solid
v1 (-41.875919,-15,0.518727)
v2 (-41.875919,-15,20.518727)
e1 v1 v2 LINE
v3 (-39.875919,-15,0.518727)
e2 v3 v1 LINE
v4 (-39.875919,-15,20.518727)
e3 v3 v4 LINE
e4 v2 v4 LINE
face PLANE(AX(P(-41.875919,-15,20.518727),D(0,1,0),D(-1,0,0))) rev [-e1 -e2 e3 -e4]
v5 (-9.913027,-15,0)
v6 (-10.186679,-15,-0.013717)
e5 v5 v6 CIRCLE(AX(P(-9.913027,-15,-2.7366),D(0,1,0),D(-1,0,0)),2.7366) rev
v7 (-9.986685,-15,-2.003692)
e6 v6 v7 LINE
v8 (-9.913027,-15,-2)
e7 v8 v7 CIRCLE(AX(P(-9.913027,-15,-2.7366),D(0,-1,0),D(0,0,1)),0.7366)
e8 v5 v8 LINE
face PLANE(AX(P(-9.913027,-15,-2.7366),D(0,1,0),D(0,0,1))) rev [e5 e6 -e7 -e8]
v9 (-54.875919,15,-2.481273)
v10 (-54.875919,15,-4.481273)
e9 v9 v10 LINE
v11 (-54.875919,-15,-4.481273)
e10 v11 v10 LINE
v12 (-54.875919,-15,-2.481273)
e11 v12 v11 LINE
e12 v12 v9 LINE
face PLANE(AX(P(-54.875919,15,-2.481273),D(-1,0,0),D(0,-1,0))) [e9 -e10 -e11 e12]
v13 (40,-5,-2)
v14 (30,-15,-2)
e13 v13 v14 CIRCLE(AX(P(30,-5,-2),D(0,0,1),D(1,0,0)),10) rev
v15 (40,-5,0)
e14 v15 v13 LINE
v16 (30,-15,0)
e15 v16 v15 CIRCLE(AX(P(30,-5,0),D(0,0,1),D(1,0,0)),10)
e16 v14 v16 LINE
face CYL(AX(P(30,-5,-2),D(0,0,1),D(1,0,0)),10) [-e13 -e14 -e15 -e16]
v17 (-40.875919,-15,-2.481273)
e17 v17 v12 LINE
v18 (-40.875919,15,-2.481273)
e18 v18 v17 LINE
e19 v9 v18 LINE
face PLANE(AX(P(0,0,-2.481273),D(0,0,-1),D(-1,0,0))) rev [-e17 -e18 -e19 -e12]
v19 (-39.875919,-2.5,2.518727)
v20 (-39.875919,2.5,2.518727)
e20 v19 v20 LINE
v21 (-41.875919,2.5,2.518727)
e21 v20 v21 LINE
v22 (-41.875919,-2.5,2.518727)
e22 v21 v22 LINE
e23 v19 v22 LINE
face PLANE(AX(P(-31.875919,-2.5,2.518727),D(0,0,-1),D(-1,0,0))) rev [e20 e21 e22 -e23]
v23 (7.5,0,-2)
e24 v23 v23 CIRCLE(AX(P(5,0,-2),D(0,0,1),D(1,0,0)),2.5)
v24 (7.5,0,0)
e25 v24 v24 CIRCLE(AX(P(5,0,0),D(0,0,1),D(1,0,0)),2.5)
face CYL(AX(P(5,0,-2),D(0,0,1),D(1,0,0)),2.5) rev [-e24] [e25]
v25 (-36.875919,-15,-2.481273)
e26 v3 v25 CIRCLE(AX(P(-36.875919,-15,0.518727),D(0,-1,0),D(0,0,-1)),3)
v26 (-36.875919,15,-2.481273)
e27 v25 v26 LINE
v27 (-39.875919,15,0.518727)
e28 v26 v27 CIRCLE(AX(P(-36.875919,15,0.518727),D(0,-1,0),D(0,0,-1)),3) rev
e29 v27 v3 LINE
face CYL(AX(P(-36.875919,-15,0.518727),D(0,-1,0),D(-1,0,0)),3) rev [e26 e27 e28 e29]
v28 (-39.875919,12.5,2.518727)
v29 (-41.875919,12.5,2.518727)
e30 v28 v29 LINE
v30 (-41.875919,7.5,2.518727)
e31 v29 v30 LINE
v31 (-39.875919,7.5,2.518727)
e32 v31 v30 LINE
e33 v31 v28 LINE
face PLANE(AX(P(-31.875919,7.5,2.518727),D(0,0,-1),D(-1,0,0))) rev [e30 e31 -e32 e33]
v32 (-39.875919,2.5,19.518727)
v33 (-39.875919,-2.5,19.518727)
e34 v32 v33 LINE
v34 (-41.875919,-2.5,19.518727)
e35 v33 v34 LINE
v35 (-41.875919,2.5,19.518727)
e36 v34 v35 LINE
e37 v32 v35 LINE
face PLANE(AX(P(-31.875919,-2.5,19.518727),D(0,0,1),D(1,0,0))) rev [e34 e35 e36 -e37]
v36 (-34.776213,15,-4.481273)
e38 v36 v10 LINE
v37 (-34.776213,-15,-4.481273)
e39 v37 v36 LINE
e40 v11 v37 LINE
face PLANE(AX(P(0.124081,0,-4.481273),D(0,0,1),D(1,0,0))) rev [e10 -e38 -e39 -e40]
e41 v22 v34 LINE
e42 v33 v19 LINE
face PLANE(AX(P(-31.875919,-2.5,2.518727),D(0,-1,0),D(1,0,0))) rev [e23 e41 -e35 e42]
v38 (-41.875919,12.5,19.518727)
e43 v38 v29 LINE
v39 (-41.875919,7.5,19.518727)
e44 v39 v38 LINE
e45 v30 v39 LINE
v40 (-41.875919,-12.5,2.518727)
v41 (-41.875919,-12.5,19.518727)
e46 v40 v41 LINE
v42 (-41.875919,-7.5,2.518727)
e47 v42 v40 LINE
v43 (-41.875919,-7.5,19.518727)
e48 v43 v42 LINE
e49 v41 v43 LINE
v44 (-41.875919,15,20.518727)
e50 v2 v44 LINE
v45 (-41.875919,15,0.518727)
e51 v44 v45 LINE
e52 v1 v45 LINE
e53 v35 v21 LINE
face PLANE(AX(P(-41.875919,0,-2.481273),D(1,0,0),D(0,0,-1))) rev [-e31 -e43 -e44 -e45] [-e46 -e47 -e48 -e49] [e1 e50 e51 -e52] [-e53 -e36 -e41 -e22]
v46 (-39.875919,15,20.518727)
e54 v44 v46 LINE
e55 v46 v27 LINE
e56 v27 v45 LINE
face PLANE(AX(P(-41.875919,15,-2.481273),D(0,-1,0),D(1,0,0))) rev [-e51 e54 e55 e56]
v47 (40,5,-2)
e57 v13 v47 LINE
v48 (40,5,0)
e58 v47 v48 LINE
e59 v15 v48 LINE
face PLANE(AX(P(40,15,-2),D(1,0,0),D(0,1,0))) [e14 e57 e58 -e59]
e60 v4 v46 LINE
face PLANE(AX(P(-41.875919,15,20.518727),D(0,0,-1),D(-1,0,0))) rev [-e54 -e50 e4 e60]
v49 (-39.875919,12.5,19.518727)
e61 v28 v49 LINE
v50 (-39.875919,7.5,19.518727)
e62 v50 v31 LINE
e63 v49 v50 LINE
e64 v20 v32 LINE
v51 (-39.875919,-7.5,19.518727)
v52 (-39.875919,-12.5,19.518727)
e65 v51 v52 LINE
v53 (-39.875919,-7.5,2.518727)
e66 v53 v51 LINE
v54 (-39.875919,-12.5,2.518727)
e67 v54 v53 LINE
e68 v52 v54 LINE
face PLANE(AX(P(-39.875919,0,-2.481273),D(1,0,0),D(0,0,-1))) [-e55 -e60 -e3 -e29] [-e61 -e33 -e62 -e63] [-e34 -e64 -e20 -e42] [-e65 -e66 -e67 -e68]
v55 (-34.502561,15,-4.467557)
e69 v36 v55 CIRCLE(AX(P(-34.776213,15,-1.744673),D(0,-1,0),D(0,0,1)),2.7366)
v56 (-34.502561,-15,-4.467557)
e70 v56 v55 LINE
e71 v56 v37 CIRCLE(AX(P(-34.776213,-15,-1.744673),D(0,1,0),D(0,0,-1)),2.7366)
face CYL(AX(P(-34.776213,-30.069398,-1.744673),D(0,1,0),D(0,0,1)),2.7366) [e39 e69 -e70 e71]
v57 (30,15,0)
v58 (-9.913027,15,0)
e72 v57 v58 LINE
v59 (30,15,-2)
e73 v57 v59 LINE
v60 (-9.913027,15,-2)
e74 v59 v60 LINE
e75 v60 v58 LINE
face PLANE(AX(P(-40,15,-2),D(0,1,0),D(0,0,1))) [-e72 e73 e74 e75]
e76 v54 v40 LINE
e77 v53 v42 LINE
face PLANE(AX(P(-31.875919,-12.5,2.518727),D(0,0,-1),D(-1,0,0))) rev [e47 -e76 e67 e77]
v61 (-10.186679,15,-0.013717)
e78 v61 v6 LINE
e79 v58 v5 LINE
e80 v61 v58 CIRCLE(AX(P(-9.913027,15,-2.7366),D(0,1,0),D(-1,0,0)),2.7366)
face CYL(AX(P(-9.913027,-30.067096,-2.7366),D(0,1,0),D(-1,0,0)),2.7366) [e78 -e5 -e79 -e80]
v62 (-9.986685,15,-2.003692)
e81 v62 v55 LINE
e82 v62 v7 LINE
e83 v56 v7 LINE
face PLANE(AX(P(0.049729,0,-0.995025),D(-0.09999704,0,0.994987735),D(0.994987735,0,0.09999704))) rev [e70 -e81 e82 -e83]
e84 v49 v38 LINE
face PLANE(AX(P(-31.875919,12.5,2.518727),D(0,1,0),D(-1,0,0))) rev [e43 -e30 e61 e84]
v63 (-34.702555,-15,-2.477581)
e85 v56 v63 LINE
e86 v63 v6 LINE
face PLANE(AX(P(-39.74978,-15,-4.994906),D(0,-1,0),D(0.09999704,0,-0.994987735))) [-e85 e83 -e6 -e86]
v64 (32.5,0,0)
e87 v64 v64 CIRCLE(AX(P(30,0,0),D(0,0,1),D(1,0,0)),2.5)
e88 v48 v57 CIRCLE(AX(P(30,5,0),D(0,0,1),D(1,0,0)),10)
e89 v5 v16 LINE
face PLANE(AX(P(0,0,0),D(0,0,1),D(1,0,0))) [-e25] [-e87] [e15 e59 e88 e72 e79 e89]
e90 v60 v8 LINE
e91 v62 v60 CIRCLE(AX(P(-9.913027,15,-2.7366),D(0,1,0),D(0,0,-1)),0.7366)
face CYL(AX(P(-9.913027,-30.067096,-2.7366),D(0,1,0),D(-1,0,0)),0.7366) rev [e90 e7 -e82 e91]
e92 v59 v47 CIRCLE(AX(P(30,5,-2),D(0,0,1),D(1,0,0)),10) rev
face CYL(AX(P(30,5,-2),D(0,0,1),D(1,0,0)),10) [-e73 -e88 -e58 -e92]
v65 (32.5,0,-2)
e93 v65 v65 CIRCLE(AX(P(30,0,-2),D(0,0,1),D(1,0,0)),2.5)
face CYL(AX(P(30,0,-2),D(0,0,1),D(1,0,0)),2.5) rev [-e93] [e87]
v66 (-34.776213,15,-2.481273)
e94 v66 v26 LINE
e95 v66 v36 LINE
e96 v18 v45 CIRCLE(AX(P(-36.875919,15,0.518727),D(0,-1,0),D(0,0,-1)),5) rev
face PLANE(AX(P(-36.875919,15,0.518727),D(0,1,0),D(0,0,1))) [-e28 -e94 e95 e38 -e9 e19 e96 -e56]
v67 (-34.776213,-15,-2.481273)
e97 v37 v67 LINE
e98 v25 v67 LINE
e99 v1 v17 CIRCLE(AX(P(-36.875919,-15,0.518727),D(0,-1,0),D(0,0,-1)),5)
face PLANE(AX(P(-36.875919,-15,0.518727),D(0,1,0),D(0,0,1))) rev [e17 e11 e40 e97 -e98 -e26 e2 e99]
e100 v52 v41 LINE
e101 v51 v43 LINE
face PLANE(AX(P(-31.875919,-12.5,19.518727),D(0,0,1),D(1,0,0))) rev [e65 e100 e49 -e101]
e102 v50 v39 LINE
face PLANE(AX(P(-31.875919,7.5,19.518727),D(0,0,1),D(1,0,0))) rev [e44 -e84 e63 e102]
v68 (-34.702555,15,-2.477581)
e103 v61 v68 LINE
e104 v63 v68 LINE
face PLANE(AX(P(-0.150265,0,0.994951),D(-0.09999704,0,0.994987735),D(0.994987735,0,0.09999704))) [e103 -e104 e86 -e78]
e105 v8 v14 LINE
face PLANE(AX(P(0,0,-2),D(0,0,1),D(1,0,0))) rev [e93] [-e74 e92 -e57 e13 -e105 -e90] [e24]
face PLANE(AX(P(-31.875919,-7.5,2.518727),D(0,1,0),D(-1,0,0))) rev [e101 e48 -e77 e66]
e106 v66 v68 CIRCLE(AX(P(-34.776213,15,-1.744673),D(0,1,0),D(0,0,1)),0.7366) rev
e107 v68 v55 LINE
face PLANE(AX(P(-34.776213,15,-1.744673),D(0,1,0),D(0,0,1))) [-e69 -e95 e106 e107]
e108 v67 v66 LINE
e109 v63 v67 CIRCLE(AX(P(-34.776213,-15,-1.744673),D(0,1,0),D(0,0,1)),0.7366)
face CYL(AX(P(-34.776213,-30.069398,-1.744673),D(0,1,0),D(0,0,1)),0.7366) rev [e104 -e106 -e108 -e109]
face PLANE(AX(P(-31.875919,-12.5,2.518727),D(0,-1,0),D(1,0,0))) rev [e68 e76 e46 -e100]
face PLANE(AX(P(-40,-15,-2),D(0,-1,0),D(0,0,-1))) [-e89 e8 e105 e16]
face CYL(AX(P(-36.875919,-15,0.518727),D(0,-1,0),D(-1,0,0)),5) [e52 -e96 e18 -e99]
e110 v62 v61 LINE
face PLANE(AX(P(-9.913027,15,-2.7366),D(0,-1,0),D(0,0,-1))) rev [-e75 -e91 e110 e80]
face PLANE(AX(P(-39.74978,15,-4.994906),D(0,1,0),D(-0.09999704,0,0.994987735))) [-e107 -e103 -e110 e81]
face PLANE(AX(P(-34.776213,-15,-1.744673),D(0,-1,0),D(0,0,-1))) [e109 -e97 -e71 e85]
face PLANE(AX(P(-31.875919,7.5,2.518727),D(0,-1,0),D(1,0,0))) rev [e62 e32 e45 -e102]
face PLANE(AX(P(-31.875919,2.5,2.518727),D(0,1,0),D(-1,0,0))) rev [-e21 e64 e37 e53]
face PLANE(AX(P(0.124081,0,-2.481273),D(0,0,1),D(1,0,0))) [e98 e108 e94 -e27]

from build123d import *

# Parameters (mm, degrees)
SKETCH1_W                    = 80
SKETCH1_H                    = 30
SKETCH1_R                    = 2.5
BASE_FLANGE1_DEPTH           = 2
FILLET1_R                    = 10
EDGE_FLANGE1_STRIP_W         = 14
EDGE_FLANGE1_STRIP_H         = 2
EDGE_FLANGE1_STRIP_CUT_DEPTH = 30
EDGE_FLANGE1_DEPTH           = 30
SKETCH9_W                    = 17
SKETCH9_H                    = 5
CUT_EXTRUDE1_DEPTH           = 10
SKETCHED_START               = -15
SKETCHED_BEND1_DEPTH         = 30
SKETCHED_START_2             = -12.5
SKETCHED_BEND1_2_DEPTH       = 5
SKETCHED_START_3             = -2.5
SKETCHED_BEND1_3_DEPTH       = 5
SKETCHED_START_4             = 7.5
SKETCHED_BEND1_4_DEPTH       = 5
SKETCHED_BEND1_5_DEPTH       = 30
SKETCHED_START_5             = -7.5
SKETCHED_BEND1_6_DEPTH       = 5
SKETCHED_START_6             = 2.5
SKETCHED_BEND1_7_DEPTH       = 5
SKETCHED_BEND1_8_DEPTH       = 2.5
SKETCHED_START_7             = 12.5
SKETCHED_BEND1_9_DEPTH       = 2.5
SKETCHED_BEND4_DEPTH         = 30
SKETCHED_BEND4_2_OUTLINE_W   = 2
SKETCHED_BEND4_2_OUTLINE_H   = 1
SKETCHED_BEND4_2_DEPTH       = 30
SKETCHED_BEND4_3_DEPTH       = 5
SKETCHED_BEND4_4_DEPTH       = 5
SKETCHED_BEND4_5_DEPTH       = 2.5
SKETCHED_BEND4_6_DEPTH       = 2.5
SKETCH18_W                   = 18
SKETCH18_H                   = 30
BOSS_EXTRUDE2_DEPTH          = 2


# Read off the part's stored shape, not the designer's step: Sketched Bend1, Sketched Bend4
# Sheet-metal steps are written as plain solids
with BuildPart() as part:
    # Sketch1 → Base-Flange1 (new body)
    with BuildSketch(Plane.XY):
        Rectangle(SKETCH1_W, SKETCH1_H)
        with Locations((30, 0)):
            Circle(SKETCH1_R, mode=Mode.SUBTRACT)
        with Locations((5, 0)):
            Circle(SKETCH1_R, mode=Mode.SUBTRACT)
    extrude(amount=-BASE_FLANGE1_DEPTH)

    # Fillet1
    fillet1_edges = [part.edges().sort_by_distance(p)[0] for p in [
        (40, -15, -1),
        (40, 15, -1),
    ]]
    fillet(fillet1_edges, radius=FILLET1_R)

    # Edge-Flange1 strip (across the edge) → Edge-Flange1 strip cut (cut)
    with BuildSketch(Plane(origin=(-40, 15, 0), x_dir=(1, 0, 0), z_dir=(0, -1, 0))):
        with Locations((-4, -1)):
            Rectangle(EDGE_FLANGE1_STRIP_W, EDGE_FLANGE1_STRIP_H)
    extrude(amount=EDGE_FLANGE1_STRIP_CUT_DEPTH, mode=Mode.SUBTRACT)

    # Edge-Flange1 section (across the edge) → Edge-Flange1 (add)
    with BuildSketch(Plane(origin=(-40, 15, 0), x_dir=(1, 0, 0), z_dir=(0, -1, 0))):
        with BuildLine():
            Line((-2, 3), (-2, 23))
            Line((-2, 23), (0, 23))
            Line((0, 23), (0, 3))
            ThreePointArc((0, 3), (0.878679656, 0.878679656), (3, 0))
            Line((3, 0), (3, -2))
            ThreePointArc((3, -2), (-0.535533906, -0.535533906), (-2, 3))
        make_face()
    extrude(amount=EDGE_FLANGE1_DEPTH)

    # Sketch9 → Cut-Extrude1 (cut)
    with BuildSketch(Plane.ZY.offset(42)):
        with Locations((13.5, 10)):
            Rectangle(SKETCH9_W, SKETCH9_H)
        with Locations((13.5, 0)):
            Rectangle(SKETCH9_W, SKETCH9_H)
        with Locations((13.5, -10)):
            Rectangle(SKETCH9_W, SKETCH9_H)
    extrude(amount=-CUT_EXTRUDE1_DEPTH, mode=Mode.SUBTRACT)

    # Sketched Bend1 outline → Sketched Bend1 (cut)
    with BuildSketch(Plane(origin=(0, 0, 0), x_dir=(1, 0, 0), z_dir=(0, 1, 0)).offset(SKETCHED_START)):
        with BuildLine():
            Line((-10.18667911, 0.013716565), (-29.950540767, 2))
            Line((-29.950540767, 2), (-37, 2))
            ThreePointArc((-37, 2), (-38.560982046, 1.750087899), (-39.965920771, 1.025334021))
            ThreePointArc((-39.965920771, 1.025334021), (-40.15194126, 0.535100989), (-40.24976541, 0.019967526))
            Line((-40.24976541, 0.019967526), (-42, -17.395167538))
            Line((-42, -17.395167538), (-42, -23))
            Line((-42, -23), (-40, -23))
            Line((-40, -23), (-40, -3))
            ThreePointArc((-40, -3), (-39.121320344, -0.878679656), (-37, 0))
            Line((-37, 0), (-9.913027212, 0))
            ThreePointArc((-9.913027212, 0), (-10.050024936, 0.003431293), (-10.18667911, 0.013716565))
        make_face()
    extrude(amount=SKETCHED_BEND1_DEPTH, mode=Mode.SUBTRACT)

    # Sketched Bend1 2 outline → Sketched Bend1 2 (cut)
    with BuildSketch(Plane(origin=(0, 0, 0), x_dir=(1, 0, 0), z_dir=(0, 1, 0)).offset(SKETCHED_START_2)):
        with BuildLine():
            Line((-40.449759489, -1.970007943), (-41.860749959, -1.828202306))
            ThreePointArc((-41.860749959, -1.828202306), (-41.965065447, -2.409978727), (-42, -3))
            Line((-42, -3), (-42, -5))
            Line((-42, -5), (-40.754276042, -5))
            Line((-40.754276042, -5), (-40.449759489, -1.970007943))
        make_face()
    extrude(amount=SKETCHED_BEND1_2_DEPTH, mode=Mode.SUBTRACT)

    # Sketched Bend1 3 outline → Sketched Bend1 3 (cut)
    with BuildSketch(Plane(origin=(0, 0, 0), x_dir=(1, 0, 0), z_dir=(0, 1, 0)).offset(SKETCHED_START_3)):
        with BuildLine():
            Line((-40.449759489, -1.970007943), (-41.860749959, -1.828202306))
            ThreePointArc((-41.860749959, -1.828202306), (-41.965065447, -2.409978727), (-42, -3))
            Line((-42, -3), (-42, -5))
            Line((-42, -5), (-40.754276042, -5))
            Line((-40.754276042, -5), (-40.449759489, -1.970007943))
        make_face()
    extrude(amount=SKETCHED_BEND1_3_DEPTH, mode=Mode.SUBTRACT)

    # Sketched Bend1 4 outline → Sketched Bend1 4 (cut)
    with BuildSketch(Plane(origin=(0, 0, 0), x_dir=(1, 0, 0), z_dir=(0, 1, 0)).offset(SKETCHED_START_4)):
        with BuildLine():
            Line((-40.449759489, -1.970007943), (-41.860749959, -1.828202306))
            ThreePointArc((-41.860749959, -1.828202306), (-41.965065447, -2.409978727), (-42, -3))
            Line((-42, -3), (-42, -5))
            Line((-42, -5), (-40.754276042, -5))
            Line((-40.754276042, -5), (-40.449759489, -1.970007943))
        make_face()
    extrude(amount=SKETCHED_BEND1_4_DEPTH, mode=Mode.SUBTRACT)

    # Sketched Bend1 5 outline → Sketched Bend1 5 (add)
    with BuildSketch(Plane(origin=(0, 0, 0), x_dir=(1, 0, 0), z_dir=(0, 1, 0)).offset(SKETCHED_START)):
        with BuildLine():
            Line((-9.986685031, 2.003692035), (-36.764817009, 4.69491508))
            ThreePointArc((-36.764817009, 4.69491508), (-40.429072155, 3.591332203), (-42.23974088, 0.219961605))
            Line((-42.23974088, 0.219961605), (-42.439734959, -1.770013864))
            Line((-42.439734959, -1.770013864), (-41.860749959, -1.828202306))
            ThreePointArc((-41.860749959, -1.828202306), (-41.165316443, -0.234111548), (-39.965920771, 1.025334021))
            ThreePointArc((-39.965920771, 1.025334021), (-38.729937691, 2.33787213), (-36.964811088, 2.704939611))
            Line((-36.964811088, 2.704939611), (-29.950540767, 2))
            Line((-29.950540767, 2), (-9.913027212, 2))
            ThreePointArc((-9.913027212, 2), (-9.949902357, 2.000923588), (-9.986685031, 2.003692035))
        make_face()
        Polygon((-42.149709161, -18.884799432), (-44.139684631, -18.684805353), (-44.23968167, -19.679793088), (-42.249706201, -19.879787167), align=None)
    extrude(amount=SKETCHED_BEND1_5_DEPTH)

    # Sketched Bend1 6 outline → Sketched Bend1 6 (add)
    with BuildSketch(Plane(origin=(0, 0, 0), x_dir=(1, 0, 0), z_dir=(0, 1, 0)).offset(SKETCHED_START_5)):
        with BuildLine():
            Line((-41.860749959, -1.828202306), (-42.439734959, -1.770013864))
            Line((-42.439734959, -1.770013864), (-44.13968463, -18.684805353))
            Line((-44.13968463, -18.684805353), (-42.149709161, -18.884799432))
            Line((-42.149709161, -18.884799432), (-42, -17.395167538))
            Line((-42, -17.395167538), (-42, -3))
            ThreePointArc((-42, -3), (-41.965065447, -2.409978727), (-41.860749959, -1.828202306))
        make_face()
    extrude(amount=SKETCHED_BEND1_6_DEPTH)

    # Sketched Bend1 7 outline → Sketched Bend1 7 (add)
    with BuildSketch(Plane(origin=(0, 0, 0), x_dir=(1, 0, 0), z_dir=(0, 1, 0)).offset(SKETCHED_START_6)):
        with BuildLine():
            Line((-41.860749959, -1.828202306), (-42.439734959, -1.770013864))
            Line((-42.439734959, -1.770013864), (-44.13968463, -18.684805353))
            Line((-44.13968463, -18.684805353), (-42.149709161, -18.884799432))
            Line((-42.149709161, -18.884799432), (-42, -17.395167538))
            Line((-42, -17.395167538), (-42, -3))
            ThreePointArc((-42, -3), (-41.965065447, -2.409978727), (-41.860749959, -1.828202306))
        make_face()
    extrude(amount=SKETCHED_BEND1_7_DEPTH)

    # Sketched Bend1 8 outline → Sketched Bend1 8 (add)
    with BuildSketch(Plane(origin=(0, 0, 0), x_dir=(1, 0, 0), z_dir=(0, 1, 0)).offset(SKETCHED_START)):
        with BuildLine():
            Line((-41.860749959, -1.828202306), (-42.439734959, -1.770013864))
            Line((-42.439734959, -1.770013864), (-44.13968463, -18.684805353))
            Line((-44.13968463, -18.684805353), (-42.149709161, -18.884799432))
            Line((-42.149709161, -18.884799432), (-42, -17.395167538))
            Line((-42, -17.395167538), (-42, -3))
            ThreePointArc((-42, -3), (-41.965065447, -2.409978727), (-41.860749959, -1.828202306))
        make_face()
    extrude(amount=SKETCHED_BEND1_8_DEPTH)

    # Sketched Bend1 9 outline → Sketched Bend1 9 (add)
    with BuildSketch(Plane(origin=(0, 0, 0), x_dir=(1, 0, 0), z_dir=(0, 1, 0)).offset(SKETCHED_START_7)):
        with BuildLine():
            Line((-41.860749959, -1.828202306), (-42.439734959, -1.770013864))
            Line((-42.439734959, -1.770013864), (-44.13968463, -18.684805353))
            Line((-44.13968463, -18.684805353), (-42.149709161, -18.884799432))
            Line((-42.149709161, -18.884799432), (-42, -17.395167538))
            Line((-42, -17.395167538), (-42, -3))
            ThreePointArc((-42, -3), (-41.965065447, -2.409978727), (-41.860749959, -1.828202306))
        make_face()
    extrude(amount=SKETCHED_BEND1_9_DEPTH)

    # Sketched Bend4 outline → Sketched Bend4 (cut)
    with BuildSketch(Plane(origin=(0, 0, 0), x_dir=(1, 0, 0), z_dir=(0, 1, 0)).offset(SKETCHED_START)):
        with BuildLine():
            Line((-41.875919477, -16.160545003), (-41.875919477, -0.518726813))
            ThreePointArc((-41.875919477, -0.518726813), (-40.411453383, 3.016807093), (-36.875919477, 4.481273187))
            Line((-36.875919477, 4.481273187), (-34.776213155, 4.481273187))
            ThreePointArc((-34.776213155, 4.481273187), (-34.639215431, 4.477841895), (-34.502561257, 4.467556622))
            Line((-34.502561257, 4.467556622), (-36.764817009, 4.69491508))
            ThreePointArc((-36.764817009, 4.69491508), (-40.429072155, 3.591332203), (-42.23974088, 0.219961605))
            Line((-42.23974088, 0.219961605), (-44.23968167, -19.679793088))
            Line((-44.23968167, -19.679793088), (-42.249706201, -19.879787167))
            Line((-42.249706201, -19.879787167), (-41.875919477, -16.160545003))
        make_face()
    extrude(amount=SKETCHED_BEND4_DEPTH, mode=Mode.SUBTRACT)

    # Sketched Bend4 2 outline → Sketched Bend4 2 (add)
    with BuildSketch(Plane(origin=(0, 0, 0), x_dir=(1, 0, 0), z_dir=(0, 1, 0)).offset(SKETCHED_START)):
        with BuildLine():
            ThreePointArc((-39.875919477, -0.518726813), (-38.997239821, 1.602593531), (-36.875919477, 2.481273187))
            Line((-36.875919477, 2.481273187), (-34.776213155, 2.481273187))
            ThreePointArc((-34.776213155, 2.481273187), (-34.73933801, 2.480349599), (-34.702555336, 2.477581152))
            Line((-34.702555336, 2.477581152), (-36.964811088, 2.704939611))
            ThreePointArc((-36.964811088, 2.704939611), (-39.163364175, 2.042789885), (-40.24976541, 0.019967526))
            Line((-40.24976541, 0.019967526), (-40.449759489, -1.970007943))
            Line((-40.449759489, -1.970007943), (-41.875919477, -1.826677757))
            Line((-41.875919477, -1.826677757), (-41.875919477, -2.518726813))
            Line((-41.875919477, -2.518726813), (-39.875919477, -2.518726813))
            Line((-39.875919477, -2.518726813), (-39.875919477, -0.518726813))
        make_face()
        with Locations((-40.875919477, -20.018726813)):
            Rectangle(SKETCHED_BEND4_2_OUTLINE_W, SKETCHED_BEND4_2_OUTLINE_H)
    extrude(amount=SKETCHED_BEND4_2_DEPTH)

    # Sketched Bend4 3 outline → Sketched Bend4 3 (add)
    with BuildSketch(Plane(origin=(0, 0, 0), x_dir=(1, 0, 0), z_dir=(0, 1, 0)).offset(SKETCHED_START_5)):
        Polygon((-39.875919477, -19.518726813), (-39.875919477, -2.518726813), (-40.504906161, -2.518726813), (-41.875919477, -16.160545003), (-41.875919477, -19.518726813), align=None)
    extrude(amount=SKETCHED_BEND4_3_DEPTH)

    # Sketched Bend4 4 outline → Sketched Bend4 4 (add)
    with BuildSketch(Plane(origin=(0, 0, 0), x_dir=(1, 0, 0), z_dir=(0, 1, 0)).offset(SKETCHED_START_6)):
        Polygon((-39.875919477, -19.518726813), (-39.875919477, -2.518726813), (-40.504906161, -2.518726813), (-41.875919477, -16.160545003), (-41.875919477, -19.518726813), align=None)
    extrude(amount=SKETCHED_BEND4_4_DEPTH)

    # Sketched Bend4 5 outline → Sketched Bend4 5 (add)
    with BuildSketch(Plane(origin=(0, 0, 0), x_dir=(1, 0, 0), z_dir=(0, 1, 0)).offset(SKETCHED_START)):
        Polygon((-39.875919477, -19.518726813), (-39.875919477, -2.518726813), (-40.504906161, -2.518726813), (-41.875919477, -16.160545003), (-41.875919477, -19.518726813), align=None)
    extrude(amount=SKETCHED_BEND4_5_DEPTH)

    # Sketched Bend4 6 outline → Sketched Bend4 6 (add)
    with BuildSketch(Plane(origin=(0, 0, 0), x_dir=(1, 0, 0), z_dir=(0, 1, 0)).offset(SKETCHED_START_7)):
        Polygon((-39.875919477, -19.518726813), (-39.875919477, -2.518726813), (-40.504906161, -2.518726813), (-41.875919477, -16.160545003), (-41.875919477, -19.518726813), align=None)
    extrude(amount=SKETCHED_BEND4_6_DEPTH)

    # Sketch18 → Boss-Extrude2 (add)
    with BuildSketch(Plane(origin=(0, 0, -4.481273187), x_dir=(-1, 0, 0), z_dir=(0, 0, -1))):
        with Locations((45.875919477, 0)):
            Rectangle(SKETCH18_W, SKETCH18_H)
    extrude(amount=-BOSS_EXTRUDE2_DEPTH)


solid = part.part
